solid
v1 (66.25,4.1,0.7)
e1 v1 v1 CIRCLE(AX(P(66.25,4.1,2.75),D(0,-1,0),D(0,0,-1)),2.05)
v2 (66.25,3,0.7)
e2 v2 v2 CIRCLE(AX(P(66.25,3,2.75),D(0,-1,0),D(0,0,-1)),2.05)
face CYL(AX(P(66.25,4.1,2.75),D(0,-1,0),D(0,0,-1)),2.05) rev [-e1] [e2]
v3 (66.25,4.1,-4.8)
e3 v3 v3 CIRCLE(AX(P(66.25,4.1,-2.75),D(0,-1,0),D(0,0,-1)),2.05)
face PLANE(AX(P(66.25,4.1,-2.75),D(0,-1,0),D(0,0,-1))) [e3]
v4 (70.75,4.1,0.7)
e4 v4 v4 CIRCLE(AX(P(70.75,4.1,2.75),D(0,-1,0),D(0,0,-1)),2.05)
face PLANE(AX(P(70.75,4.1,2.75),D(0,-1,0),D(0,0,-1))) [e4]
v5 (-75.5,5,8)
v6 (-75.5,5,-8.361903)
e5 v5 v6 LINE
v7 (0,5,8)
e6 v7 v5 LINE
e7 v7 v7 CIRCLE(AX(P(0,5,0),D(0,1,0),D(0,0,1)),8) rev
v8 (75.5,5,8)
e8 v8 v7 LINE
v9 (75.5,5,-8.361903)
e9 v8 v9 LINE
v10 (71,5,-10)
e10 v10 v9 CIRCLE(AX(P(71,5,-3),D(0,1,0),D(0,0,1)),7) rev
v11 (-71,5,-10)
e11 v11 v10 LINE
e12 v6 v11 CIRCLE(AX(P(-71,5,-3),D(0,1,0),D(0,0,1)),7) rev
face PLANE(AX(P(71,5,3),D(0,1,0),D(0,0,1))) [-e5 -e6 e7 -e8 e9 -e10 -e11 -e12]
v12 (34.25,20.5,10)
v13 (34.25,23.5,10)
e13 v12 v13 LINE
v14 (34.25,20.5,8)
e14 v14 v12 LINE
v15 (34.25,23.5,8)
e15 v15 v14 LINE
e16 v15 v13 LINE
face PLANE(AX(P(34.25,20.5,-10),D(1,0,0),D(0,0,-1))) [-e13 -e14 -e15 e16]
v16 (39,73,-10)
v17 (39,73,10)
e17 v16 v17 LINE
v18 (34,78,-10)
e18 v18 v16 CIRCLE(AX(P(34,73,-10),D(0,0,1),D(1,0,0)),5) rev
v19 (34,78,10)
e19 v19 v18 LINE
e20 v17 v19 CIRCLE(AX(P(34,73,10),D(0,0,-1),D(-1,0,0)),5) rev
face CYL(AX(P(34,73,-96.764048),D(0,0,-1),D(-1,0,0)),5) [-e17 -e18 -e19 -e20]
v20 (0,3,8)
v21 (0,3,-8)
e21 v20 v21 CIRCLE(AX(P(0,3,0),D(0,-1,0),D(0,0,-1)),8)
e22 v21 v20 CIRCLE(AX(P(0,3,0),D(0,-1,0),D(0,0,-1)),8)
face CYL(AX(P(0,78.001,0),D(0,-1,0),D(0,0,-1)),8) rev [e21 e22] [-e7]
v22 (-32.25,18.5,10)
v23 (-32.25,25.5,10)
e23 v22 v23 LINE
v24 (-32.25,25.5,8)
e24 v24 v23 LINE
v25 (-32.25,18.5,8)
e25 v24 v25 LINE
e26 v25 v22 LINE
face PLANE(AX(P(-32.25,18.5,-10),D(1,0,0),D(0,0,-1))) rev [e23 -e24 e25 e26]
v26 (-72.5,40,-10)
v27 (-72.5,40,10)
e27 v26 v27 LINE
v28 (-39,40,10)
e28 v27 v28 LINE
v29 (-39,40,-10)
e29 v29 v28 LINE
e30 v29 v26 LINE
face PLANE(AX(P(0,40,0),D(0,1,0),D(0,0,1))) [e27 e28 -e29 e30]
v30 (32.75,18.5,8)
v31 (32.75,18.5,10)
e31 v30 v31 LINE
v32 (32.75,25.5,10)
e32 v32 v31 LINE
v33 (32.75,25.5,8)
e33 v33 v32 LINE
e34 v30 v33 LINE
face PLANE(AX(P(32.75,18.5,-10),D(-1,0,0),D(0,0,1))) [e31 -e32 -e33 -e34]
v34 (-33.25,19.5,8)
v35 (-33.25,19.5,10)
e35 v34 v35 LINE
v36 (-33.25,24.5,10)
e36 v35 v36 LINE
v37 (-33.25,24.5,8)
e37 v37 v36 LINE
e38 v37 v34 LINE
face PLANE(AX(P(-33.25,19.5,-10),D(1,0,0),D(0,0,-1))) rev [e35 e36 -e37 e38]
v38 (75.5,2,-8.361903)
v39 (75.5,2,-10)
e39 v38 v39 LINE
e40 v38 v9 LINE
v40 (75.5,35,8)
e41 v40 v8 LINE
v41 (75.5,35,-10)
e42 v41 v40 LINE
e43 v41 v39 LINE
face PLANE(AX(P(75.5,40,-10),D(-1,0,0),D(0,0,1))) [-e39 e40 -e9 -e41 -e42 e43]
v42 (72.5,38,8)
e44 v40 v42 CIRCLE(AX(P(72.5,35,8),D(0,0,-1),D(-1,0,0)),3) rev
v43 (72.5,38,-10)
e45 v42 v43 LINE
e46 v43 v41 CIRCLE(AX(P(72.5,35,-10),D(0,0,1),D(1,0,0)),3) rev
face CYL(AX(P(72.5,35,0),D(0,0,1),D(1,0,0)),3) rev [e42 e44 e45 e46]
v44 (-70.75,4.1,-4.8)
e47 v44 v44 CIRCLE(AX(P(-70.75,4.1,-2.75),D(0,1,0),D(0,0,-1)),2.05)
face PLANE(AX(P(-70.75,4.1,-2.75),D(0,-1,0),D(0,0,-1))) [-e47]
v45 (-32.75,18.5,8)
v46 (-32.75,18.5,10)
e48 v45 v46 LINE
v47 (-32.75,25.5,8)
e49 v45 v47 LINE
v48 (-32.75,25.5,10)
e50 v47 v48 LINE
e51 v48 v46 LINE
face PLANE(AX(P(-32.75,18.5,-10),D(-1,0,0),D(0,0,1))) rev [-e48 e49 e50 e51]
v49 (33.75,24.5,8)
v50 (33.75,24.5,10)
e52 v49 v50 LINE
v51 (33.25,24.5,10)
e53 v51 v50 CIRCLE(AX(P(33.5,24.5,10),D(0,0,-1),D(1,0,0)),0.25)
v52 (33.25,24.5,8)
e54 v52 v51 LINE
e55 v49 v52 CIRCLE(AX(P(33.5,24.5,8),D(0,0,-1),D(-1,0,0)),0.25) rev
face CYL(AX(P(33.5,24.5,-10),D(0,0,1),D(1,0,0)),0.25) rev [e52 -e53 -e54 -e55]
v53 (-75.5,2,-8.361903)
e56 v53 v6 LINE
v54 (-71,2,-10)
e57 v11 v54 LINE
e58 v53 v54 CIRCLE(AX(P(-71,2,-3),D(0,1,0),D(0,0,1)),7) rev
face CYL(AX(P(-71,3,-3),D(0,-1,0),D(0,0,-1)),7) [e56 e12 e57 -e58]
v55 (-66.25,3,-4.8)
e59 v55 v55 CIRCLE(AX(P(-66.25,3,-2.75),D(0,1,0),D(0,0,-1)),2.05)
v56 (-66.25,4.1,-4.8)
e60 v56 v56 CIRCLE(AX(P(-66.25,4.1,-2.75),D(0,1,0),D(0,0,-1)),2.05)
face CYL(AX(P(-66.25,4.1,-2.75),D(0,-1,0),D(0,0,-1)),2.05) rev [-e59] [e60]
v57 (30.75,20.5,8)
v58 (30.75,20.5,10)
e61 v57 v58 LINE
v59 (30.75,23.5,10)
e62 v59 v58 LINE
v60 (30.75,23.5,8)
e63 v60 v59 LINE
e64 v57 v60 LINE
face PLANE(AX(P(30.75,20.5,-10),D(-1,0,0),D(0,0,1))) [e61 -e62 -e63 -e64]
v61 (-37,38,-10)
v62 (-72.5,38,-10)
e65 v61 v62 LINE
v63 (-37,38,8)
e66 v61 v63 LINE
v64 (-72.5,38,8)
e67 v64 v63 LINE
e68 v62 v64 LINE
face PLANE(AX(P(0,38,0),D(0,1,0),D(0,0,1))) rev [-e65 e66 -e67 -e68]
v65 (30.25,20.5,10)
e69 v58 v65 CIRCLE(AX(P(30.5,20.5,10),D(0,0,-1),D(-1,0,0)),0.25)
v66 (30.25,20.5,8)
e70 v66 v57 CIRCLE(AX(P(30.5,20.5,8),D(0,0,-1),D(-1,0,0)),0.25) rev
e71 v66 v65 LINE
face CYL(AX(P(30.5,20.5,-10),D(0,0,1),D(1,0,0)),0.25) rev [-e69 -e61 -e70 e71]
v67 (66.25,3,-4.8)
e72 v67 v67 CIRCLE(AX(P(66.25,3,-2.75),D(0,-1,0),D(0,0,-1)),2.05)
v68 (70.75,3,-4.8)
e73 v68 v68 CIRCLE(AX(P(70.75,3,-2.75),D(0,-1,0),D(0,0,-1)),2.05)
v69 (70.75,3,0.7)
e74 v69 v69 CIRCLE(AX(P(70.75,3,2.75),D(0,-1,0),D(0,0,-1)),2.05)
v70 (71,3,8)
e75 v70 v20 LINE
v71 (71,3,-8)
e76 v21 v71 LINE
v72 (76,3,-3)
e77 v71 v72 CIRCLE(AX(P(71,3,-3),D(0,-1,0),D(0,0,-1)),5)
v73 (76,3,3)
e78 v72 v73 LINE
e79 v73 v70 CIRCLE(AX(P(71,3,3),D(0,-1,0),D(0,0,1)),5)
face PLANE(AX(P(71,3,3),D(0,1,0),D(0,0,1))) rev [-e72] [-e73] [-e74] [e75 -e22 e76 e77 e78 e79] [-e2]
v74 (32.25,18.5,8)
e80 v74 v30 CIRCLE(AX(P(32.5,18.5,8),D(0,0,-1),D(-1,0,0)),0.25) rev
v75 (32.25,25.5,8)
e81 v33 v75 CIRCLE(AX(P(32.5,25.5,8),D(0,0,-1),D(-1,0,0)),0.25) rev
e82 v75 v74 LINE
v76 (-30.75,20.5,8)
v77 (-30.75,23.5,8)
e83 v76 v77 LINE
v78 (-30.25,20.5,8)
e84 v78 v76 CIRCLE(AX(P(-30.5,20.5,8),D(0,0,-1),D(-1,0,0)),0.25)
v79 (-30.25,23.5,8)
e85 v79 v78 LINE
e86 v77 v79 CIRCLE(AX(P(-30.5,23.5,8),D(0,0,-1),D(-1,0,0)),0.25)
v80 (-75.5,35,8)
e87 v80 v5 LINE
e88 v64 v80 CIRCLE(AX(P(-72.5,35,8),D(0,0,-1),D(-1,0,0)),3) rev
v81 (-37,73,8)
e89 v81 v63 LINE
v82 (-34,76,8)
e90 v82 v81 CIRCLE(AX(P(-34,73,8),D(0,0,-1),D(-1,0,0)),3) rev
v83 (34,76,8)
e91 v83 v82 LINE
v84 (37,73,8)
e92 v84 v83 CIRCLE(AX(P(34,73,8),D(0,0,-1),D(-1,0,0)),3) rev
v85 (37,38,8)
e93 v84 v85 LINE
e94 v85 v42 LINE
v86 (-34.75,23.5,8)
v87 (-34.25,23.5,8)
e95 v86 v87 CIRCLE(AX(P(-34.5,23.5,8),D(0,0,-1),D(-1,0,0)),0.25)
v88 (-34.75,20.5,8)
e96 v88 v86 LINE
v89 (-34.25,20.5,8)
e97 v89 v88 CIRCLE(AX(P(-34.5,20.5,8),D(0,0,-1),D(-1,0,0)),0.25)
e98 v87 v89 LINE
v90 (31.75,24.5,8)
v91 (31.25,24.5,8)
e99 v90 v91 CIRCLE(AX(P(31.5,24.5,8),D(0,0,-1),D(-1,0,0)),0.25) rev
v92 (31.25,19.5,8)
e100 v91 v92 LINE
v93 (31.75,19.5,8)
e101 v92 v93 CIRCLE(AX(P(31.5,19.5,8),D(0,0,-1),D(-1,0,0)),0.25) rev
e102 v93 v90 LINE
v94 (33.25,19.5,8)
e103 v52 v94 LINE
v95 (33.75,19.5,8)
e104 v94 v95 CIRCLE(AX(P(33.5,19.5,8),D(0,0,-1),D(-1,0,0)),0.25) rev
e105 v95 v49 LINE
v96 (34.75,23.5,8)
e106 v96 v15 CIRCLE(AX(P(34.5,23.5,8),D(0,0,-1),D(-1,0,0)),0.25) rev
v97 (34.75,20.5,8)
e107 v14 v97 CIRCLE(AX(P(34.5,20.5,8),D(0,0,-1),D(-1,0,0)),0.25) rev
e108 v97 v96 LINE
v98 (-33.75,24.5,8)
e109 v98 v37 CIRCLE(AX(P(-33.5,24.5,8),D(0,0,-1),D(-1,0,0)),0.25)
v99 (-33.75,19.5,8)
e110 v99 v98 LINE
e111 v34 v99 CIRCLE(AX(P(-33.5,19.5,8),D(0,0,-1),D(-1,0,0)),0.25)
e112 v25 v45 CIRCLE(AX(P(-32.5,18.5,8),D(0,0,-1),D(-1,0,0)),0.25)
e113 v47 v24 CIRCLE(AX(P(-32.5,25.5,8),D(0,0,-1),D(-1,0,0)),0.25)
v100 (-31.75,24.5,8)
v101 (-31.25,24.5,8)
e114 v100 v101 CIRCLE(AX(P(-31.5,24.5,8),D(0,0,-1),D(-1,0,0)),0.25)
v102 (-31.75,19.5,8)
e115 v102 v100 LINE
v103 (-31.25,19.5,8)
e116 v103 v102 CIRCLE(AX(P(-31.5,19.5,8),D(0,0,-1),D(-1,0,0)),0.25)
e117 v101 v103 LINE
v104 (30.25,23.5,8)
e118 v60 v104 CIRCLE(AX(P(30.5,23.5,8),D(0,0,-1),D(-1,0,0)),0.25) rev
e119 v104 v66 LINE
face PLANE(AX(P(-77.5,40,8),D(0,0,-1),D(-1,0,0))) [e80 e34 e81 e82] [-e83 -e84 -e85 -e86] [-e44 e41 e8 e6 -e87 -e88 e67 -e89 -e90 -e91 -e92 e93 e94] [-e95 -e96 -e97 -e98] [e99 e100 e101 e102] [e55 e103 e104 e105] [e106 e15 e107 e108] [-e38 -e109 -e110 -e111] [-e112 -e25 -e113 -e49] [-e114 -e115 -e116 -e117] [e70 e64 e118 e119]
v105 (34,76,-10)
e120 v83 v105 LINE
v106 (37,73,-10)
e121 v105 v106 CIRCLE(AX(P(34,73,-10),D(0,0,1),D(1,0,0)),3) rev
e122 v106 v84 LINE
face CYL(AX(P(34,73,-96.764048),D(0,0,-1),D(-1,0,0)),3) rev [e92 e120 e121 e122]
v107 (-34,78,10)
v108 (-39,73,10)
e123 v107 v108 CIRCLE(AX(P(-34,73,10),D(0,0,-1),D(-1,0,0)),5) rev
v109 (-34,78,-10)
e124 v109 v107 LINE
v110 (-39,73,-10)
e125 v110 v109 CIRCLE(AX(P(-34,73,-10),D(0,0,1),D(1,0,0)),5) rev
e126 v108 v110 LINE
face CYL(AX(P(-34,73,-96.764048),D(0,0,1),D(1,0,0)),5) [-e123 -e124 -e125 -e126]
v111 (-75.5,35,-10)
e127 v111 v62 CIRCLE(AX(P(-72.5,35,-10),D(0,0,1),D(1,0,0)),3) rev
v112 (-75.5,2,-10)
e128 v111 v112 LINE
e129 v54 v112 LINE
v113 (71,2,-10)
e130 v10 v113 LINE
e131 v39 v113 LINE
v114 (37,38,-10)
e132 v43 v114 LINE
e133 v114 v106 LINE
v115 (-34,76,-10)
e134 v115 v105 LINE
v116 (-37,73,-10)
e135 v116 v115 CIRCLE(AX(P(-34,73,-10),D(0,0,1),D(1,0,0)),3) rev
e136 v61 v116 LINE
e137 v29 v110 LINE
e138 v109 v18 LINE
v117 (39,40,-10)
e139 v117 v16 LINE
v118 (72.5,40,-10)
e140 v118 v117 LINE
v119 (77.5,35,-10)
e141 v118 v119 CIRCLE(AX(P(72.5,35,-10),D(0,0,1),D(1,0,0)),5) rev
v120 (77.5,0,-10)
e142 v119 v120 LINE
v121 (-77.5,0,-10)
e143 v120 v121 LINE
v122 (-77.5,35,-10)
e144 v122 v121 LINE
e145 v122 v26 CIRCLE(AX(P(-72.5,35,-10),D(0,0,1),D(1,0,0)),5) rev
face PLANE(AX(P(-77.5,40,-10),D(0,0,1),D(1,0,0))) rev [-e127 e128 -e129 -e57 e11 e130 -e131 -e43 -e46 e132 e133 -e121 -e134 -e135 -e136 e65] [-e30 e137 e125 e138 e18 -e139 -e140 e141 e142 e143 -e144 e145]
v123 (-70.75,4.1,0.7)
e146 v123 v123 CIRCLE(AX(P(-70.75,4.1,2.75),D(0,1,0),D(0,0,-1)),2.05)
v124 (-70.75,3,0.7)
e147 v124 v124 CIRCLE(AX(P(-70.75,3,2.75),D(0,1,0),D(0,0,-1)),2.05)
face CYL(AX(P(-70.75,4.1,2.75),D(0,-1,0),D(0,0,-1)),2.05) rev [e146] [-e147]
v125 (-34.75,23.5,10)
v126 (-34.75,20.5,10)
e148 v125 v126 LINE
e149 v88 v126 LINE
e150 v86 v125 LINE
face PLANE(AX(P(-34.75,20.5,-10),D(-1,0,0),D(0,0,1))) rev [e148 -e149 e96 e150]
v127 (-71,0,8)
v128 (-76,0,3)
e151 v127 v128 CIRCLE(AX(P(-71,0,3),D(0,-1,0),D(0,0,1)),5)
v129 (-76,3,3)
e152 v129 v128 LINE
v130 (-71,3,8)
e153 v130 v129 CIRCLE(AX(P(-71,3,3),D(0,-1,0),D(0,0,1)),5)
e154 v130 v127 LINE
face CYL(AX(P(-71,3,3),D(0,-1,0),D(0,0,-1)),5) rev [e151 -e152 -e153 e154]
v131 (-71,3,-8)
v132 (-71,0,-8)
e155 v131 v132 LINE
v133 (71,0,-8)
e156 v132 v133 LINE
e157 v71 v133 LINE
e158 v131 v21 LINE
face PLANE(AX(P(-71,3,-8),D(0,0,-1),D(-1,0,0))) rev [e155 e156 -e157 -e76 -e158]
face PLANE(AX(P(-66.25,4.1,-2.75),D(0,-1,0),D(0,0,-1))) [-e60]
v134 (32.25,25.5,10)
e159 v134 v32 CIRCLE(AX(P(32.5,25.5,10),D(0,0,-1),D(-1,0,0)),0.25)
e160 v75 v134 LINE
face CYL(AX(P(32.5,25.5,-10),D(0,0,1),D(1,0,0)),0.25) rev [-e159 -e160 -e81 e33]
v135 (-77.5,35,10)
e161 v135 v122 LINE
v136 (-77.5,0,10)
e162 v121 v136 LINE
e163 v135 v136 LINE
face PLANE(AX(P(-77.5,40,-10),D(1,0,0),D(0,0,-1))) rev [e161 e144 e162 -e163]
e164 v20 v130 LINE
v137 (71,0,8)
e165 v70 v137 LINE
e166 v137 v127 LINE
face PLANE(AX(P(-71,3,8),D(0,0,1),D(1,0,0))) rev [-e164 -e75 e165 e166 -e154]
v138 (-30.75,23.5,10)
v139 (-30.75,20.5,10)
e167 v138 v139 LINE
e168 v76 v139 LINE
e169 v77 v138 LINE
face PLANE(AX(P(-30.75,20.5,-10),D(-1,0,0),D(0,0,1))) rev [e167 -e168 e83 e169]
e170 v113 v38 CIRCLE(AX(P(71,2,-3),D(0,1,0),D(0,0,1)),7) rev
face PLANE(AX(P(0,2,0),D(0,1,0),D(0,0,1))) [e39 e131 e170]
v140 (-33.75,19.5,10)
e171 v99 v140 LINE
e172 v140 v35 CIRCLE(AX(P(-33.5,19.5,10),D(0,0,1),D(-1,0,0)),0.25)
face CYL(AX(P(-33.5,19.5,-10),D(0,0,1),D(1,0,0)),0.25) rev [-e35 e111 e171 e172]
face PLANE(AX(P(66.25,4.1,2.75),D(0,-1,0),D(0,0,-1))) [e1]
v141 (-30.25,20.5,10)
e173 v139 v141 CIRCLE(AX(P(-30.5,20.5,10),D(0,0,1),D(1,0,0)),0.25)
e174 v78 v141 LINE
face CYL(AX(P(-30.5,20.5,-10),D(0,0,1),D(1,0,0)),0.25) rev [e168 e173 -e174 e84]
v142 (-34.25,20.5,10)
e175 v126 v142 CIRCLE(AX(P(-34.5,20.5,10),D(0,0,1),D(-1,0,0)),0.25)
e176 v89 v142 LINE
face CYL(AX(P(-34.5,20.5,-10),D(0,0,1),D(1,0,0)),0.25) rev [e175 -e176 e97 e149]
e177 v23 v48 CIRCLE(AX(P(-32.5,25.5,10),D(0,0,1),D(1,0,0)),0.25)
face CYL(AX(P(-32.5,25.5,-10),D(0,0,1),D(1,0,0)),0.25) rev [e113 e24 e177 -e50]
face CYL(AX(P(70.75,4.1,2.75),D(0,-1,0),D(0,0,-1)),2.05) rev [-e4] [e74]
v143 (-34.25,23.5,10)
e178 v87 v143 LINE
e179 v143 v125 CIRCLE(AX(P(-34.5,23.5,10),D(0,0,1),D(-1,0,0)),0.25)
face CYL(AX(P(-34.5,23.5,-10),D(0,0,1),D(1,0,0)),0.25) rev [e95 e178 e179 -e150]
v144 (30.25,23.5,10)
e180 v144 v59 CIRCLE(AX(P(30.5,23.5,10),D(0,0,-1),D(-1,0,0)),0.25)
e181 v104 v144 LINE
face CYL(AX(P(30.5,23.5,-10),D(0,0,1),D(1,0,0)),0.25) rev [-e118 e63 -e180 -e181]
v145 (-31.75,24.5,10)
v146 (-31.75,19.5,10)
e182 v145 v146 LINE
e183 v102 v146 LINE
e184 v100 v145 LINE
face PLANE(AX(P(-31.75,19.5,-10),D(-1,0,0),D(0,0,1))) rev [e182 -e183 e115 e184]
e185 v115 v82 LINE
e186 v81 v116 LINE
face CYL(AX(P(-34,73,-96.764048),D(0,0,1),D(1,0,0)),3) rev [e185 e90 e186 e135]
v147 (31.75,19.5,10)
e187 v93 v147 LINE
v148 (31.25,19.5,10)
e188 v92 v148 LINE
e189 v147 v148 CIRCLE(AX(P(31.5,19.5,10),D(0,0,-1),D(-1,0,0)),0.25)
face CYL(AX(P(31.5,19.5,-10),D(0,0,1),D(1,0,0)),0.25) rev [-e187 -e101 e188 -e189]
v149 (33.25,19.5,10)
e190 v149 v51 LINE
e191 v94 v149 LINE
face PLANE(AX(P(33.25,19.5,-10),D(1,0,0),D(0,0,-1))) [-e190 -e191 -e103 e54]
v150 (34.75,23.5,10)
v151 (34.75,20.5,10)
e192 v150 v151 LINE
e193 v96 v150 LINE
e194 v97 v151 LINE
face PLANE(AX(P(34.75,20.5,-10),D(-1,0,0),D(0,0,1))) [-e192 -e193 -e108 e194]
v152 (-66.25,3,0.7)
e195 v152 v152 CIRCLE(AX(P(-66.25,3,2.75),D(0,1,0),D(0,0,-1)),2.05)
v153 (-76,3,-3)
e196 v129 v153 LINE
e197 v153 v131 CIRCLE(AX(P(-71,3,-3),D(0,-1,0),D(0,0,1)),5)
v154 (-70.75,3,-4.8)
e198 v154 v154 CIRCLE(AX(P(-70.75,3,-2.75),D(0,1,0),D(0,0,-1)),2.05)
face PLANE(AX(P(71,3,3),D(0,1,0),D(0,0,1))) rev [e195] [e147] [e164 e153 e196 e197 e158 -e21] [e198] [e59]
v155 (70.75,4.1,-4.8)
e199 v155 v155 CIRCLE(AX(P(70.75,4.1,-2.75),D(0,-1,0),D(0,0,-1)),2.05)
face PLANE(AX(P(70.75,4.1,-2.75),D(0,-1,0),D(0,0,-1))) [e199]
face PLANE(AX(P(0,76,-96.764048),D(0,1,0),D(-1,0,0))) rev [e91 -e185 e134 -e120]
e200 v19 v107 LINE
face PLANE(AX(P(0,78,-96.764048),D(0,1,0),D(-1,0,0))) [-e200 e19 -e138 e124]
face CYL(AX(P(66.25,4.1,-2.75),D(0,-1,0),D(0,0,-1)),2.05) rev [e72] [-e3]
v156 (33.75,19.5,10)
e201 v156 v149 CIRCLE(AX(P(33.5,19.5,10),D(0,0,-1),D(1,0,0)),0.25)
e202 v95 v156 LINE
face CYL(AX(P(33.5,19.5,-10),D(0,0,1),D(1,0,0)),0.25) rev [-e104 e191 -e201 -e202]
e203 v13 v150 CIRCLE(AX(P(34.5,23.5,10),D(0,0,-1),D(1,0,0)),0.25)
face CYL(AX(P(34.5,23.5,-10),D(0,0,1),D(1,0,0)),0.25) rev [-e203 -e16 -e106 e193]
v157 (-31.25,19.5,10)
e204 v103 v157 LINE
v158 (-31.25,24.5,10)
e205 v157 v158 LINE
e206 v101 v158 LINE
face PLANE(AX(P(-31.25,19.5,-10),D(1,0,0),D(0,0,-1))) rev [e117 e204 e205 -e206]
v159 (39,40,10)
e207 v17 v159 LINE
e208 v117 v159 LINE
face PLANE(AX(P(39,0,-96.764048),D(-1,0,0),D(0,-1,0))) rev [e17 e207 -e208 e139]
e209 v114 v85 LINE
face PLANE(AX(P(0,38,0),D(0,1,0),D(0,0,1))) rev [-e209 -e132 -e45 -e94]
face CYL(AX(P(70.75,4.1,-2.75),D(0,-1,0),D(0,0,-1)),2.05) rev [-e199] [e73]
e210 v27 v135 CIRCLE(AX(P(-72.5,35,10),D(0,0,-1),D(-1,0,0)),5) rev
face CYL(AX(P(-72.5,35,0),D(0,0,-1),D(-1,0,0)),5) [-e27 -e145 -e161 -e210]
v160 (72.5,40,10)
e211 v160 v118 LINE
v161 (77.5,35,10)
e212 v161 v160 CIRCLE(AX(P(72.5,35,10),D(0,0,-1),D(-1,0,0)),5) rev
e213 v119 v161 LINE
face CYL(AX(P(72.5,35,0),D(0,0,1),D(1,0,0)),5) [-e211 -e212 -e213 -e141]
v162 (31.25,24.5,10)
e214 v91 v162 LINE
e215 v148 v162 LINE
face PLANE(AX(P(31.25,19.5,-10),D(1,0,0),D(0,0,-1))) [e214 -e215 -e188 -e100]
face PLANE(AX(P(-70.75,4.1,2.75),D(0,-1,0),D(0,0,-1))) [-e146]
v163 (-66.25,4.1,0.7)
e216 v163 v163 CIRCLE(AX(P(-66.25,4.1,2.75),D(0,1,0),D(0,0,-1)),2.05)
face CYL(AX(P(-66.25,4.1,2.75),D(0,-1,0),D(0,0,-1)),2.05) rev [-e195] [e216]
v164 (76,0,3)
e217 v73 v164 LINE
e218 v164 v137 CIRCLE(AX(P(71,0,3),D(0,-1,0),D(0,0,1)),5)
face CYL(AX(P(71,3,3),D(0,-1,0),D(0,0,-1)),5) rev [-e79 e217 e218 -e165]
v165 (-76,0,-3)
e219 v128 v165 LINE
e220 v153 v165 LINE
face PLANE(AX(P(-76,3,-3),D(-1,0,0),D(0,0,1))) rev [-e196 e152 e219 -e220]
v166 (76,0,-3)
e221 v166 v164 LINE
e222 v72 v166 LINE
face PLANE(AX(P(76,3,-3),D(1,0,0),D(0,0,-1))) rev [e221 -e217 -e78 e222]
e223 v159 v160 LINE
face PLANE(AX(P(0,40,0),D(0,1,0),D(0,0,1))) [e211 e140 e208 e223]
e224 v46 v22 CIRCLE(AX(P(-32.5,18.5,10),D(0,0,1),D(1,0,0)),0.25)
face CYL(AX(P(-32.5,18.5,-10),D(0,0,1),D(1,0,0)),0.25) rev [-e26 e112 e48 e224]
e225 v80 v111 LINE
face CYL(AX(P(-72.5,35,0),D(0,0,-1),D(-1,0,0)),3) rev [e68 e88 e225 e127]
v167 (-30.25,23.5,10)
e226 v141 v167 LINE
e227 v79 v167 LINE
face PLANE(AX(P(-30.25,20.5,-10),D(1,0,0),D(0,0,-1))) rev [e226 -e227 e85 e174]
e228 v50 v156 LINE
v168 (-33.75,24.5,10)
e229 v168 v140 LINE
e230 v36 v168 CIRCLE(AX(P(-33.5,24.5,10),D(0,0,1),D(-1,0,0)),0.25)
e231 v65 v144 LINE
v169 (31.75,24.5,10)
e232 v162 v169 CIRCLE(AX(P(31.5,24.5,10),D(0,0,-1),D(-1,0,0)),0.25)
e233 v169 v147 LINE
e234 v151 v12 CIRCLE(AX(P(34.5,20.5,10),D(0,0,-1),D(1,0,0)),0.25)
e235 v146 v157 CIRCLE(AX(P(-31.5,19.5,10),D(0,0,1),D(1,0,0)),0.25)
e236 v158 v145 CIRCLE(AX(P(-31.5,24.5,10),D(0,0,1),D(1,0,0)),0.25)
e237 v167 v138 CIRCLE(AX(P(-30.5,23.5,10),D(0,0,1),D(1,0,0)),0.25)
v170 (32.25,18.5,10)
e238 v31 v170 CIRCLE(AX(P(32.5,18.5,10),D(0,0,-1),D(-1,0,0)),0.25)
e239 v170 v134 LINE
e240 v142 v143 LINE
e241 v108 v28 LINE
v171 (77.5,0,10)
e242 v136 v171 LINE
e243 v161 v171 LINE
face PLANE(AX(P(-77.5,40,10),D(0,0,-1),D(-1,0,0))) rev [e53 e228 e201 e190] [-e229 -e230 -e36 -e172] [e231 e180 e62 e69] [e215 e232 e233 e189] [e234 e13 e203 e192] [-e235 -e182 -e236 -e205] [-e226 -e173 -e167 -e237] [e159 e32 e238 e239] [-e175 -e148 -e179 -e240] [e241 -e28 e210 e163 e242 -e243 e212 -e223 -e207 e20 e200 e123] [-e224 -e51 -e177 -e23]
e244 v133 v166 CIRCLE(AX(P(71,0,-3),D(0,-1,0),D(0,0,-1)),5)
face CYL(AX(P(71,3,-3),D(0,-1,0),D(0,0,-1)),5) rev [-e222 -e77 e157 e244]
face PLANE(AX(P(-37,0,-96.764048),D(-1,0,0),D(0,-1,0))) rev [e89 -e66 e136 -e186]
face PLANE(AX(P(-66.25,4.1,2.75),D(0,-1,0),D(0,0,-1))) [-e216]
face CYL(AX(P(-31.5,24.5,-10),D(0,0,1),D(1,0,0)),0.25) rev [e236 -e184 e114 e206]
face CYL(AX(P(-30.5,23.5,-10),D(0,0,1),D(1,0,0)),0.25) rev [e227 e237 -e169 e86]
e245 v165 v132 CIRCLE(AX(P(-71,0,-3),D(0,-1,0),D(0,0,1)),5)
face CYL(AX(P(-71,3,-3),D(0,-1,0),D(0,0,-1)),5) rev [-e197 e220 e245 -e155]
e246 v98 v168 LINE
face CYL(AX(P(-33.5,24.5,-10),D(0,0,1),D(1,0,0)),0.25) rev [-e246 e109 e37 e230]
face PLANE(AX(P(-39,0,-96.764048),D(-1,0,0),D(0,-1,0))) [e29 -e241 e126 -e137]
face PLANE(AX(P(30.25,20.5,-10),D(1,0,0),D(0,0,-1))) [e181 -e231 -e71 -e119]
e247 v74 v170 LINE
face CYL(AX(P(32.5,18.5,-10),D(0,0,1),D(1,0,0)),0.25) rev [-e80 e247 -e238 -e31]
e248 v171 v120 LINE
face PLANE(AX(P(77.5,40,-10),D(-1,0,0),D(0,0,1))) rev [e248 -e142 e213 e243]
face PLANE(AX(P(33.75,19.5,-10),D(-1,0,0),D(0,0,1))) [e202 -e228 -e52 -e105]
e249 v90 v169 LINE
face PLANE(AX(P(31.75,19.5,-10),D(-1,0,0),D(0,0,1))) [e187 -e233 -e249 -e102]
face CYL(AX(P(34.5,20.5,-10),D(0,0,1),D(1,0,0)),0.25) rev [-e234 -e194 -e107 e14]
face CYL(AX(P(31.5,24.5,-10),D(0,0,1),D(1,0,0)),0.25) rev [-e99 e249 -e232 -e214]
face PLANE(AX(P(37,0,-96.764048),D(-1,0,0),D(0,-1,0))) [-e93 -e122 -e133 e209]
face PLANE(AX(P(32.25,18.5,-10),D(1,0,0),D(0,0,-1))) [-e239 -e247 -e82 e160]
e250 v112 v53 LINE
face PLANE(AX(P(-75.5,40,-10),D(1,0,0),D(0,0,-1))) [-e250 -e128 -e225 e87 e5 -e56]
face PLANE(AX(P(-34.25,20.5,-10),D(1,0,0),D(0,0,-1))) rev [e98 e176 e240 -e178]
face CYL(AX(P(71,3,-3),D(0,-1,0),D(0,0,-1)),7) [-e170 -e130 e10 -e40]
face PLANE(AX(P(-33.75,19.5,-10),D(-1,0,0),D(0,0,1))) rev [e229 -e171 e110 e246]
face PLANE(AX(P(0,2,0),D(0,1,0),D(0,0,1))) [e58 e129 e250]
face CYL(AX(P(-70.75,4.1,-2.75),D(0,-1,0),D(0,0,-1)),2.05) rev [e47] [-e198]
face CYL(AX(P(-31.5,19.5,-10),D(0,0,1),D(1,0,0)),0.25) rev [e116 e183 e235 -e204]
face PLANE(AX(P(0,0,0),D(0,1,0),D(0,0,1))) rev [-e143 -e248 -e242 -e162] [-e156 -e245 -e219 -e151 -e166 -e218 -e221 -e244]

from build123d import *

# Parameters (mm, degrees)
SKETCH1_W           = 155
SKETCH1_H           = 20
BOSS_EXTRUDE1_DEPTH = 40
CUT_EXTRUDE1_DEPTH  = 3
SKETCH4_W           = 78
SKETCH4_H           = 38
BOSS_EXTRUDE2_DEPTH = 20
FILLET1_R           = 5
SHELL2_START        = -10
SHELL2_DEPTH        = 18
SHELL2_START_2      = 2
SHELL2_2_DEPTH      = 3
CUT_EXTRUDE3_DEPTH  = 112.759787043
CUT_EXTRUDE4_REACH  = 110.311
SKETCH8_R           = 8
SKETCH9_R           = 2.05
CUT_EXTRUDE5_DEPTH  = 1.1


with BuildPart() as part:
    # Sketch1 → Boss-Extrude1 (new body)
    with BuildSketch(Plane(origin=(0, 0, 0), x_dir=(1, 0, 0), z_dir=(0, 1, 0))):
        Rectangle(SKETCH1_W, SKETCH1_H)
    extrude(amount=BOSS_EXTRUDE1_DEPTH)

    # Sketch2 → Cut-Extrude1 (cut)
    with BuildSketch(Plane.XZ):
        with BuildLine():
            Line((-71, -8), (71, -8))
            ThreePointArc((71, -8), (74.535533906, -6.535533906), (76, -3))
            Line((76, -3), (76, 3))
            ThreePointArc((76, 3), (74.535533906, 6.535533906), (71, 8))
            Line((71, 8), (-71, 8))
            ThreePointArc((-71, 8), (-74.535533906, 6.535533906), (-76, 3))
            Line((-76, 3), (-76, -3))
            ThreePointArc((-76, -3), (-74.535533906, -6.535533906), (-71, -8))
        make_face()
    extrude(amount=-CUT_EXTRUDE1_DEPTH, mode=Mode.SUBTRACT)

    # Sketch4 → Boss-Extrude2 (add)
    with BuildSketch(Plane.XY.offset(10)):
        with Locations((0, 59)):
            Rectangle(SKETCH4_W, SKETCH4_H)
    extrude(amount=-BOSS_EXTRUDE2_DEPTH)

    # Fillet1
    fillet1_edges = [part.edges().sort_by_distance(p)[0] for p in [
        (-77.5, 40, 0),
        (77.5, 40, 0),
        (-39, 78, 0),
        (39, 78, 0),
    ]]
    fillet(fillet1_edges, radius=FILLET1_R)

    # Shell2: read off the stored shape, not the designer's step
    # Shell2 outline → Shell2 (cut)
    with BuildSketch(Plane.XY.offset(SHELL2_START)):
        with BuildLine():
            Line((-75.5, 35), (-75.5, 5))
            Line((-75.5, 5), (75.5, 5))
            Line((75.5, 5), (75.5, 35))
            ThreePointArc((75.5, 35), (74.621320344, 37.121320344), (72.5, 38))
            Line((72.5, 38), (37, 38))
            Line((37, 38), (37, 73))
            ThreePointArc((37, 73), (36.121320344, 75.121320344), (34, 76))
            Line((34, 76), (-34, 76))
            ThreePointArc((-34, 76), (-36.121320344, 75.121320344), (-37, 73))
            Line((-37, 73), (-37, 38))
            Line((-37, 38), (-72.5, 38))
            ThreePointArc((-72.5, 38), (-74.621320344, 37.121320344), (-75.5, 35))
        make_face()
    extrude(amount=SHELL2_DEPTH, mode=Mode.SUBTRACT)

    # Shell2 2 outline → Shell2 2 (cut)
    with BuildSketch(Plane(origin=(0, 0, 0), x_dir=(1, 0, 0), z_dir=(0, 1, 0)).offset(SHELL2_START_2)):
        with BuildLine():
            Line((75.5, 10), (71, 10))
            ThreePointArc((71, 10), (73.394439545, 9.577739678), (75.5, 8.361902647))
            Line((75.5, 8.361902647), (75.5, 10))
        make_face()
        with BuildLine():
            ThreePointArc((-75.5, 8.361902647), (-73.394439545, 9.577739678), (-71, 10))
            Line((-71, 10), (-75.5, 10))
            Line((-75.5, 10), (-75.5, 8.361902647))
        make_face()
    extrude(amount=SHELL2_2_DEPTH, mode=Mode.SUBTRACT)

    # Sketch7 → Cut-Extrude3 (cut, through all)
    with BuildSketch(Plane.XY.offset(10)):
        with BuildLine():
            Line((-32.75, 18.5), (-32.75, 25.5))
            ThreePointArc((-32.75, 25.5), (-32.5, 25.75), (-32.25, 25.5))
            Line((-32.25, 25.5), (-32.25, 18.5))
            ThreePointArc((-32.25, 18.5), (-32.5, 18.25), (-32.75, 18.5))
        make_face()
        with BuildLine():
            Line((-31.75, 19.5), (-31.75, 24.5))
            ThreePointArc((-31.75, 24.5), (-31.5, 24.75), (-31.25, 24.5))
            Line((-31.25, 24.5), (-31.25, 19.5))
            ThreePointArc((-31.25, 19.5), (-31.5, 19.25), (-31.75, 19.5))
        make_face()
        with BuildLine():
            Line((-30.75, 20.5), (-30.75, 23.5))
            ThreePointArc((-30.75, 23.5), (-30.5, 23.75), (-30.25, 23.5))
            Line((-30.25, 23.5), (-30.25, 20.5))
            ThreePointArc((-30.25, 20.5), (-30.5, 20.25), (-30.75, 20.5))
        make_face()
        with BuildLine():
            Line((-33.25, 19.5), (-33.25, 24.5))
            ThreePointArc((-33.25, 24.5), (-33.5, 24.75), (-33.75, 24.5))
            Line((-33.75, 24.5), (-33.75, 19.5))
            ThreePointArc((-33.75, 19.5), (-33.5, 19.25), (-33.25, 19.5))
        make_face()
        with BuildLine():
            Line((-34.25, 20.5), (-34.25, 23.5))
            ThreePointArc((-34.25, 23.5), (-34.5, 23.75), (-34.75, 23.5))
            Line((-34.75, 23.5), (-34.75, 20.5))
            ThreePointArc((-34.75, 20.5), (-34.5, 20.25), (-34.25, 20.5))
        make_face()
    cut_extrude3 = extrude(amount=-CUT_EXTRUDE3_DEPTH, mode=Mode.SUBTRACT)

    # Mirror1: Cut-Extrude3 across plane
    add(cut_extrude3.mirror(Plane(origin=(0, 0, 0), x_dir=(0, 0, 1), z_dir=(1, 0, 0))), mode=Mode.SUBTRACT)

    # Sketch8 → Cut-Extrude4 (cut, up to next)
    with BuildSketch(Plane.XZ.offset(-3), mode=Mode.PRIVATE) as cut_extrude4_sk1:
        with Locations(Location((0, 0, 0), (0, 0, 90))):
            Circle(SKETCH8_R)
    cut_extrude4_tool1 = extrude(cut_extrude4_sk1.sketch, amount=-CUT_EXTRUDE4_REACH, mode=Mode.PRIVATE) & part.part
    add(cut_extrude4_tool1.solids().sort_by_distance((0, 3, 0))[0], mode=Mode.SUBTRACT)

    # Sketch9 → Cut-Extrude5 (cut)
    with BuildSketch(Plane.XZ.offset(-3)):
        with Locations(Location((70.75, 2.75, 0), (0, 0, 270))):
            Circle(SKETCH9_R)
        with Locations(Location((66.25, 2.75, 0), (0, 0, 270))):
            Circle(SKETCH9_R)
        with Locations(Location((66.25, -2.75, 0), (0, 0, 270))):
            Circle(SKETCH9_R)
        with Locations(Location((70.75, -2.75, 0), (0, 0, 270))):
            Circle(SKETCH9_R)
    cut_extrude5 = extrude(amount=-CUT_EXTRUDE5_DEPTH, mode=Mode.SUBTRACT)

    # Mirror2: Cut-Extrude5 across plane
    add(cut_extrude5.mirror(Plane(origin=(0, 0, 0), x_dir=(0, 0, 1), z_dir=(1, 0, 0))), mode=Mode.SUBTRACT)


solid = part.part
